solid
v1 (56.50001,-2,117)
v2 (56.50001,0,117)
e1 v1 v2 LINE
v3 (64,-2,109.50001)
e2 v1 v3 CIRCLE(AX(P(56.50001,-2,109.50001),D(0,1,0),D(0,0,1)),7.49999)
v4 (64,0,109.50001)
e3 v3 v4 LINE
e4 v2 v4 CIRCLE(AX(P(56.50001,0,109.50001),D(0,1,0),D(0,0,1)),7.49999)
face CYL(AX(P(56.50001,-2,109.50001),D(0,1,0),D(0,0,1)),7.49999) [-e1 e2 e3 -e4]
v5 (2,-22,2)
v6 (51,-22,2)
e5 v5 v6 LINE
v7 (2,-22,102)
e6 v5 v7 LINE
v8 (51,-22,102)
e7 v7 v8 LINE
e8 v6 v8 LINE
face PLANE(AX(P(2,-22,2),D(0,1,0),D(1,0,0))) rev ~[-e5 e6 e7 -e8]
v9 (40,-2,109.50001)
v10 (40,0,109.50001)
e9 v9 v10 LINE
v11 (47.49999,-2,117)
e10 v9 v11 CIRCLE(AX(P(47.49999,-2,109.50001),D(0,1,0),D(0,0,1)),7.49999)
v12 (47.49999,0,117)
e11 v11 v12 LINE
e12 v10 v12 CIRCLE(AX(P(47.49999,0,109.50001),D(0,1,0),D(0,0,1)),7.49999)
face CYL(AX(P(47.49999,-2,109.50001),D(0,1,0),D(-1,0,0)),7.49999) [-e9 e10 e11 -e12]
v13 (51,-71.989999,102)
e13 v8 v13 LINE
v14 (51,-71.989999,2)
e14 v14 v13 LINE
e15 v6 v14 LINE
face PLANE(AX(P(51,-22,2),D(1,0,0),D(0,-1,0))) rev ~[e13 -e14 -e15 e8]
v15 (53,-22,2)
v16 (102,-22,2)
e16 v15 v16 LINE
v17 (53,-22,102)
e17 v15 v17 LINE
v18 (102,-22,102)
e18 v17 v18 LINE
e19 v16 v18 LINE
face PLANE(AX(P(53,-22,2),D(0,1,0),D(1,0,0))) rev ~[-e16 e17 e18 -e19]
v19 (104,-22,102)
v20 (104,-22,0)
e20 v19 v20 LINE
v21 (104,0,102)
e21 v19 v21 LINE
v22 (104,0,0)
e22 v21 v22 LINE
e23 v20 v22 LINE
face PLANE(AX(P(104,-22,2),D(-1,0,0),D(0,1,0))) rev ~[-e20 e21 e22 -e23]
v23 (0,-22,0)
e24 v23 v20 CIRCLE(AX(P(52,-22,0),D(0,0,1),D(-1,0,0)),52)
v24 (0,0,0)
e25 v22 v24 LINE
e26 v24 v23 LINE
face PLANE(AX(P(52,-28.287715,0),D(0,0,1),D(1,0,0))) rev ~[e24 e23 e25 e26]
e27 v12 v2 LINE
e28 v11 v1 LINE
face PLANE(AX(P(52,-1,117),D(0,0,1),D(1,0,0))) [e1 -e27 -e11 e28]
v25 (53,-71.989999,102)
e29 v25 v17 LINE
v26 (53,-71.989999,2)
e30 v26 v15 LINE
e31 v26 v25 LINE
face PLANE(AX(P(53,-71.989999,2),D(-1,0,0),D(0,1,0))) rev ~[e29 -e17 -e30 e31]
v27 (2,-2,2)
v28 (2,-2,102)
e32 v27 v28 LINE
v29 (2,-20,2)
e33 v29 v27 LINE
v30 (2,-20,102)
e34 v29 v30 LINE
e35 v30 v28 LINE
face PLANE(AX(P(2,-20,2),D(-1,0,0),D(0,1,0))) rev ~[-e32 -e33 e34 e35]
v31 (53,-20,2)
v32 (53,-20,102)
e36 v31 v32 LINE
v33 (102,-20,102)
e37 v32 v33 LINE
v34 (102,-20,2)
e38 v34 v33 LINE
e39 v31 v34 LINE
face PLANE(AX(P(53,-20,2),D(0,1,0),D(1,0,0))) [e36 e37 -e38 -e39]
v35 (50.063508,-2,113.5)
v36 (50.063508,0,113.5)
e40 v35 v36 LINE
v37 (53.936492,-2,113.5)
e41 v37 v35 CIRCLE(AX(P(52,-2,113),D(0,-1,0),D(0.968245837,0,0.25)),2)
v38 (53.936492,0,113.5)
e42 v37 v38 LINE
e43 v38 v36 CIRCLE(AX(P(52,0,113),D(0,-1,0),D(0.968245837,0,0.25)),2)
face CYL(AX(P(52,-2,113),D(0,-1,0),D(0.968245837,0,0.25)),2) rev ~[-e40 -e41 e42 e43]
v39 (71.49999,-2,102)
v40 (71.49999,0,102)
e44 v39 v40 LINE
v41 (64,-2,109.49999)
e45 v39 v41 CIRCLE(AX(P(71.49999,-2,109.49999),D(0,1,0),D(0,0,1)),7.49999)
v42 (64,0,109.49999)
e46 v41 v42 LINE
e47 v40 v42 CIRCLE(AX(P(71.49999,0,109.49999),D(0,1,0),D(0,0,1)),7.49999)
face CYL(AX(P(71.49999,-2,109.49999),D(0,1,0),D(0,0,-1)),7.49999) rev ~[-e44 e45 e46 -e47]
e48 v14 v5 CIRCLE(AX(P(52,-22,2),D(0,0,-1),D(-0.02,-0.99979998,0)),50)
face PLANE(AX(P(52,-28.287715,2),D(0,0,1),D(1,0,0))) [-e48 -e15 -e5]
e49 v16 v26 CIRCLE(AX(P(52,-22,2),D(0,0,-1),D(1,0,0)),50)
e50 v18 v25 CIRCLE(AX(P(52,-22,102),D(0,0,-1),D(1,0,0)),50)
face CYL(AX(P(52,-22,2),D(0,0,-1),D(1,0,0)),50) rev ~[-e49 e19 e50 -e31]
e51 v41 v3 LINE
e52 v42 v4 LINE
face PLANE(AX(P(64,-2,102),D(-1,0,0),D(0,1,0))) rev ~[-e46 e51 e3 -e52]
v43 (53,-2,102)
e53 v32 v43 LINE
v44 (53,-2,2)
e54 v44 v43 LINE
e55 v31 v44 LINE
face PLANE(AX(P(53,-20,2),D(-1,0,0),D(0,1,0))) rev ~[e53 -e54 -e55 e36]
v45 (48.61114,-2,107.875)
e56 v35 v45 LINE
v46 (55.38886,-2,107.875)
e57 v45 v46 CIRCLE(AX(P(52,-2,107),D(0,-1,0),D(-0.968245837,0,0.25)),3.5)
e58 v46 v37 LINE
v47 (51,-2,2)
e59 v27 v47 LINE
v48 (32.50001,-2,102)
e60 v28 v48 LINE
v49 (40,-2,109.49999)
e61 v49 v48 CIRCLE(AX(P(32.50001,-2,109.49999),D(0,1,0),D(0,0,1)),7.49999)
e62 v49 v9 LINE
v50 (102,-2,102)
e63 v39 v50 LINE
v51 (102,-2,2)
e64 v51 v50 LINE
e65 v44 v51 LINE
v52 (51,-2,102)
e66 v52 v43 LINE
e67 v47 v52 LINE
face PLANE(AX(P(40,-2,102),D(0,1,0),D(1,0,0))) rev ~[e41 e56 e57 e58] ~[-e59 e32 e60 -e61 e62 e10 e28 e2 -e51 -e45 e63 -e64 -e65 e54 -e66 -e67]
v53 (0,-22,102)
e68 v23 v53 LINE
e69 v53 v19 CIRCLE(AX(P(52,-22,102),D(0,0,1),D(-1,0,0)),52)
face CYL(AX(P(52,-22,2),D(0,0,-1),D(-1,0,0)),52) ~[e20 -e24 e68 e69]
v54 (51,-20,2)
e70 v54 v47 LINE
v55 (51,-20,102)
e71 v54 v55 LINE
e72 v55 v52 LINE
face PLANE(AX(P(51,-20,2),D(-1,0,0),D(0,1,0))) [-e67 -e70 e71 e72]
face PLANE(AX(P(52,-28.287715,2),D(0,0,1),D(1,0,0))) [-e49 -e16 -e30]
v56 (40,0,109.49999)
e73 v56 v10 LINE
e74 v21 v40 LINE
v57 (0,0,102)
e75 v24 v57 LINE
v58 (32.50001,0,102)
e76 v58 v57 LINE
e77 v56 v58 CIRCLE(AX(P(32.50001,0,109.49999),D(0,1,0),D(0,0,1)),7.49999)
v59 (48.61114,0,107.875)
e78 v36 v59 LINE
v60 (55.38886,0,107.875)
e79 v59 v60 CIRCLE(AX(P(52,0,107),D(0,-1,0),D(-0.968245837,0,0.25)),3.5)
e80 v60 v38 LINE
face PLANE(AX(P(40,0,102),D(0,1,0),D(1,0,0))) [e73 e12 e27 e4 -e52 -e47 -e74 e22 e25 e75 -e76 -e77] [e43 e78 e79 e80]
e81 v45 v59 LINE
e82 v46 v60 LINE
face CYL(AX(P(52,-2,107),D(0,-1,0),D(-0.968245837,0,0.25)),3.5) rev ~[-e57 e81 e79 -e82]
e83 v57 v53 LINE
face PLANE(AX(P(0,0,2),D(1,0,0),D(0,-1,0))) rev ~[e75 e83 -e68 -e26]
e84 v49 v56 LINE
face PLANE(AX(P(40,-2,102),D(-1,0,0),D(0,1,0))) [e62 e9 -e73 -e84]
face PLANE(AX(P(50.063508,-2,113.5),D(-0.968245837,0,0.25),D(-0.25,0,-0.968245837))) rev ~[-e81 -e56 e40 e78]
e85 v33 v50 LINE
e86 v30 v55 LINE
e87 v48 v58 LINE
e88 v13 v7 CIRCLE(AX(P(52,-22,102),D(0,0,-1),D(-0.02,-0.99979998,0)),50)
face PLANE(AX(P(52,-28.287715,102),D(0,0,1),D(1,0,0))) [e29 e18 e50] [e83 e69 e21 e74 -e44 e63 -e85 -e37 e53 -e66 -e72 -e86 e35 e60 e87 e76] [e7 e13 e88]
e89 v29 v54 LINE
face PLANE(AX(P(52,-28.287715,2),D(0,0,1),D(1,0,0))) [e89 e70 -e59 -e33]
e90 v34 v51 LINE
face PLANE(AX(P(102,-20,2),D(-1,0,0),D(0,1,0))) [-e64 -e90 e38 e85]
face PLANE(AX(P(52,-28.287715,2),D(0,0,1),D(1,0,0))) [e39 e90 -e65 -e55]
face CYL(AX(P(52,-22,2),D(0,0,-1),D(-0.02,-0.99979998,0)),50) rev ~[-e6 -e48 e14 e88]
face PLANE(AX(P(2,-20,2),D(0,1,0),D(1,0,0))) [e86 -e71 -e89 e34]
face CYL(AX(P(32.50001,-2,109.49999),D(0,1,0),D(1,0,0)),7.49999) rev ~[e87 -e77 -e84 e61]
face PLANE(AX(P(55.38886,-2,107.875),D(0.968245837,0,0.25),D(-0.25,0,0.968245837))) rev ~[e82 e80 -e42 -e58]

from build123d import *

# Parameters (mm, degrees)
F1_DEPTH = 2
F2_W     = 49
F2_H     = 18
F3_DEPTH = 100
F4_W     = 24
F4_H     = 2
F5_DEPTH = 15
F7_DEPTH = 2
F8_R     = 7.49999


# Not quite as in the source:
# - a fillet or chamfer is up to 0.001 mm smaller than in the source, because OpenCascade refuses the exact size


with BuildPart() as f1:
    # F0 (on Top) → F1 (new body)
    with BuildSketch(Plane.XY):
        with BuildLine():
            Line((104, 0), (0, 0))
            Line((0, 0), (0, -22))
            ThreePointArc((0, -22), (52, -74), (104, -22))
            Line((104, -22), (104, 0))
        make_face()
    extrude(amount=F1_DEPTH)

    # F2 (on face) → F3 (join)
    with BuildSketch(Plane.XY.offset(2)):
        with BuildLine():
            Line((104, 0), (0, 0))
            Line((0, 0), (0, -22))
            ThreePointArc((0, -22), (52, -74), (104, -22))
            Line((104, -22), (104, 0))
        make_face()
        with BuildLine():
            ThreePointArc((51, -71.9899989998), (16.2928578573, -57), (2, -22))
            Line((2, -22), (51, -22))
            Line((51, -22), (51, -71.9899989998))
        make_face(mode=Mode.SUBTRACT)
        with BuildLine():
            ThreePointArc((102, -22), (87.7071421427, -57), (53, -71.9899989998))
            Line((53, -71.9899989998), (53, -22))
            Line((53, -22), (102, -22))
        make_face(mode=Mode.SUBTRACT)
        with Locations((26.5, -11)):
            Rectangle(F2_W, F2_H, mode=Mode.SUBTRACT)
        with Locations((77.5, -11)):
            Rectangle(F2_W, F2_H, mode=Mode.SUBTRACT)
    extrude(amount=F3_DEPTH)

    # F4 (on face) → F5 (join)
    with BuildSketch(Plane.XY.offset(102)):
        with Locations((52, -1)):
            Rectangle(F4_W, F4_H)
    extrude(amount=F5_DEPTH)

    # F6 (on face) → F7 (cut, through all)
    with BuildSketch(Plane.XZ.offset(2)):
        with BuildLine():
            Line((55.3888604279, 107.875), (53.9364916731, 113.5))
            ThreePointArc((53.9364916731, 113.5), (52, 115), (50.0635083269, 113.5))
            Line((50.0635083269, 113.5), (48.6111395721, 107.875))
            ThreePointArc((48.6111395721, 107.875), (52, 103.5), (55.3888604279, 107.875))
        make_face()
    extrude(amount=-F7_DEPTH, mode=Mode.SUBTRACT)

    # F8 (radius 7.5 in the source; OpenCascade refuses exactly that, so slightly less here)
    f8_edges = [f1.edges().sort_by_distance(p)[0] for p in [
        (64, -1, 102),
        (64, -1, 117),
        (40, -1, 102),
        (40, -1, 117),
    ]]
    fillet(f8_edges, radius=F8_R)


solid = f1.part
